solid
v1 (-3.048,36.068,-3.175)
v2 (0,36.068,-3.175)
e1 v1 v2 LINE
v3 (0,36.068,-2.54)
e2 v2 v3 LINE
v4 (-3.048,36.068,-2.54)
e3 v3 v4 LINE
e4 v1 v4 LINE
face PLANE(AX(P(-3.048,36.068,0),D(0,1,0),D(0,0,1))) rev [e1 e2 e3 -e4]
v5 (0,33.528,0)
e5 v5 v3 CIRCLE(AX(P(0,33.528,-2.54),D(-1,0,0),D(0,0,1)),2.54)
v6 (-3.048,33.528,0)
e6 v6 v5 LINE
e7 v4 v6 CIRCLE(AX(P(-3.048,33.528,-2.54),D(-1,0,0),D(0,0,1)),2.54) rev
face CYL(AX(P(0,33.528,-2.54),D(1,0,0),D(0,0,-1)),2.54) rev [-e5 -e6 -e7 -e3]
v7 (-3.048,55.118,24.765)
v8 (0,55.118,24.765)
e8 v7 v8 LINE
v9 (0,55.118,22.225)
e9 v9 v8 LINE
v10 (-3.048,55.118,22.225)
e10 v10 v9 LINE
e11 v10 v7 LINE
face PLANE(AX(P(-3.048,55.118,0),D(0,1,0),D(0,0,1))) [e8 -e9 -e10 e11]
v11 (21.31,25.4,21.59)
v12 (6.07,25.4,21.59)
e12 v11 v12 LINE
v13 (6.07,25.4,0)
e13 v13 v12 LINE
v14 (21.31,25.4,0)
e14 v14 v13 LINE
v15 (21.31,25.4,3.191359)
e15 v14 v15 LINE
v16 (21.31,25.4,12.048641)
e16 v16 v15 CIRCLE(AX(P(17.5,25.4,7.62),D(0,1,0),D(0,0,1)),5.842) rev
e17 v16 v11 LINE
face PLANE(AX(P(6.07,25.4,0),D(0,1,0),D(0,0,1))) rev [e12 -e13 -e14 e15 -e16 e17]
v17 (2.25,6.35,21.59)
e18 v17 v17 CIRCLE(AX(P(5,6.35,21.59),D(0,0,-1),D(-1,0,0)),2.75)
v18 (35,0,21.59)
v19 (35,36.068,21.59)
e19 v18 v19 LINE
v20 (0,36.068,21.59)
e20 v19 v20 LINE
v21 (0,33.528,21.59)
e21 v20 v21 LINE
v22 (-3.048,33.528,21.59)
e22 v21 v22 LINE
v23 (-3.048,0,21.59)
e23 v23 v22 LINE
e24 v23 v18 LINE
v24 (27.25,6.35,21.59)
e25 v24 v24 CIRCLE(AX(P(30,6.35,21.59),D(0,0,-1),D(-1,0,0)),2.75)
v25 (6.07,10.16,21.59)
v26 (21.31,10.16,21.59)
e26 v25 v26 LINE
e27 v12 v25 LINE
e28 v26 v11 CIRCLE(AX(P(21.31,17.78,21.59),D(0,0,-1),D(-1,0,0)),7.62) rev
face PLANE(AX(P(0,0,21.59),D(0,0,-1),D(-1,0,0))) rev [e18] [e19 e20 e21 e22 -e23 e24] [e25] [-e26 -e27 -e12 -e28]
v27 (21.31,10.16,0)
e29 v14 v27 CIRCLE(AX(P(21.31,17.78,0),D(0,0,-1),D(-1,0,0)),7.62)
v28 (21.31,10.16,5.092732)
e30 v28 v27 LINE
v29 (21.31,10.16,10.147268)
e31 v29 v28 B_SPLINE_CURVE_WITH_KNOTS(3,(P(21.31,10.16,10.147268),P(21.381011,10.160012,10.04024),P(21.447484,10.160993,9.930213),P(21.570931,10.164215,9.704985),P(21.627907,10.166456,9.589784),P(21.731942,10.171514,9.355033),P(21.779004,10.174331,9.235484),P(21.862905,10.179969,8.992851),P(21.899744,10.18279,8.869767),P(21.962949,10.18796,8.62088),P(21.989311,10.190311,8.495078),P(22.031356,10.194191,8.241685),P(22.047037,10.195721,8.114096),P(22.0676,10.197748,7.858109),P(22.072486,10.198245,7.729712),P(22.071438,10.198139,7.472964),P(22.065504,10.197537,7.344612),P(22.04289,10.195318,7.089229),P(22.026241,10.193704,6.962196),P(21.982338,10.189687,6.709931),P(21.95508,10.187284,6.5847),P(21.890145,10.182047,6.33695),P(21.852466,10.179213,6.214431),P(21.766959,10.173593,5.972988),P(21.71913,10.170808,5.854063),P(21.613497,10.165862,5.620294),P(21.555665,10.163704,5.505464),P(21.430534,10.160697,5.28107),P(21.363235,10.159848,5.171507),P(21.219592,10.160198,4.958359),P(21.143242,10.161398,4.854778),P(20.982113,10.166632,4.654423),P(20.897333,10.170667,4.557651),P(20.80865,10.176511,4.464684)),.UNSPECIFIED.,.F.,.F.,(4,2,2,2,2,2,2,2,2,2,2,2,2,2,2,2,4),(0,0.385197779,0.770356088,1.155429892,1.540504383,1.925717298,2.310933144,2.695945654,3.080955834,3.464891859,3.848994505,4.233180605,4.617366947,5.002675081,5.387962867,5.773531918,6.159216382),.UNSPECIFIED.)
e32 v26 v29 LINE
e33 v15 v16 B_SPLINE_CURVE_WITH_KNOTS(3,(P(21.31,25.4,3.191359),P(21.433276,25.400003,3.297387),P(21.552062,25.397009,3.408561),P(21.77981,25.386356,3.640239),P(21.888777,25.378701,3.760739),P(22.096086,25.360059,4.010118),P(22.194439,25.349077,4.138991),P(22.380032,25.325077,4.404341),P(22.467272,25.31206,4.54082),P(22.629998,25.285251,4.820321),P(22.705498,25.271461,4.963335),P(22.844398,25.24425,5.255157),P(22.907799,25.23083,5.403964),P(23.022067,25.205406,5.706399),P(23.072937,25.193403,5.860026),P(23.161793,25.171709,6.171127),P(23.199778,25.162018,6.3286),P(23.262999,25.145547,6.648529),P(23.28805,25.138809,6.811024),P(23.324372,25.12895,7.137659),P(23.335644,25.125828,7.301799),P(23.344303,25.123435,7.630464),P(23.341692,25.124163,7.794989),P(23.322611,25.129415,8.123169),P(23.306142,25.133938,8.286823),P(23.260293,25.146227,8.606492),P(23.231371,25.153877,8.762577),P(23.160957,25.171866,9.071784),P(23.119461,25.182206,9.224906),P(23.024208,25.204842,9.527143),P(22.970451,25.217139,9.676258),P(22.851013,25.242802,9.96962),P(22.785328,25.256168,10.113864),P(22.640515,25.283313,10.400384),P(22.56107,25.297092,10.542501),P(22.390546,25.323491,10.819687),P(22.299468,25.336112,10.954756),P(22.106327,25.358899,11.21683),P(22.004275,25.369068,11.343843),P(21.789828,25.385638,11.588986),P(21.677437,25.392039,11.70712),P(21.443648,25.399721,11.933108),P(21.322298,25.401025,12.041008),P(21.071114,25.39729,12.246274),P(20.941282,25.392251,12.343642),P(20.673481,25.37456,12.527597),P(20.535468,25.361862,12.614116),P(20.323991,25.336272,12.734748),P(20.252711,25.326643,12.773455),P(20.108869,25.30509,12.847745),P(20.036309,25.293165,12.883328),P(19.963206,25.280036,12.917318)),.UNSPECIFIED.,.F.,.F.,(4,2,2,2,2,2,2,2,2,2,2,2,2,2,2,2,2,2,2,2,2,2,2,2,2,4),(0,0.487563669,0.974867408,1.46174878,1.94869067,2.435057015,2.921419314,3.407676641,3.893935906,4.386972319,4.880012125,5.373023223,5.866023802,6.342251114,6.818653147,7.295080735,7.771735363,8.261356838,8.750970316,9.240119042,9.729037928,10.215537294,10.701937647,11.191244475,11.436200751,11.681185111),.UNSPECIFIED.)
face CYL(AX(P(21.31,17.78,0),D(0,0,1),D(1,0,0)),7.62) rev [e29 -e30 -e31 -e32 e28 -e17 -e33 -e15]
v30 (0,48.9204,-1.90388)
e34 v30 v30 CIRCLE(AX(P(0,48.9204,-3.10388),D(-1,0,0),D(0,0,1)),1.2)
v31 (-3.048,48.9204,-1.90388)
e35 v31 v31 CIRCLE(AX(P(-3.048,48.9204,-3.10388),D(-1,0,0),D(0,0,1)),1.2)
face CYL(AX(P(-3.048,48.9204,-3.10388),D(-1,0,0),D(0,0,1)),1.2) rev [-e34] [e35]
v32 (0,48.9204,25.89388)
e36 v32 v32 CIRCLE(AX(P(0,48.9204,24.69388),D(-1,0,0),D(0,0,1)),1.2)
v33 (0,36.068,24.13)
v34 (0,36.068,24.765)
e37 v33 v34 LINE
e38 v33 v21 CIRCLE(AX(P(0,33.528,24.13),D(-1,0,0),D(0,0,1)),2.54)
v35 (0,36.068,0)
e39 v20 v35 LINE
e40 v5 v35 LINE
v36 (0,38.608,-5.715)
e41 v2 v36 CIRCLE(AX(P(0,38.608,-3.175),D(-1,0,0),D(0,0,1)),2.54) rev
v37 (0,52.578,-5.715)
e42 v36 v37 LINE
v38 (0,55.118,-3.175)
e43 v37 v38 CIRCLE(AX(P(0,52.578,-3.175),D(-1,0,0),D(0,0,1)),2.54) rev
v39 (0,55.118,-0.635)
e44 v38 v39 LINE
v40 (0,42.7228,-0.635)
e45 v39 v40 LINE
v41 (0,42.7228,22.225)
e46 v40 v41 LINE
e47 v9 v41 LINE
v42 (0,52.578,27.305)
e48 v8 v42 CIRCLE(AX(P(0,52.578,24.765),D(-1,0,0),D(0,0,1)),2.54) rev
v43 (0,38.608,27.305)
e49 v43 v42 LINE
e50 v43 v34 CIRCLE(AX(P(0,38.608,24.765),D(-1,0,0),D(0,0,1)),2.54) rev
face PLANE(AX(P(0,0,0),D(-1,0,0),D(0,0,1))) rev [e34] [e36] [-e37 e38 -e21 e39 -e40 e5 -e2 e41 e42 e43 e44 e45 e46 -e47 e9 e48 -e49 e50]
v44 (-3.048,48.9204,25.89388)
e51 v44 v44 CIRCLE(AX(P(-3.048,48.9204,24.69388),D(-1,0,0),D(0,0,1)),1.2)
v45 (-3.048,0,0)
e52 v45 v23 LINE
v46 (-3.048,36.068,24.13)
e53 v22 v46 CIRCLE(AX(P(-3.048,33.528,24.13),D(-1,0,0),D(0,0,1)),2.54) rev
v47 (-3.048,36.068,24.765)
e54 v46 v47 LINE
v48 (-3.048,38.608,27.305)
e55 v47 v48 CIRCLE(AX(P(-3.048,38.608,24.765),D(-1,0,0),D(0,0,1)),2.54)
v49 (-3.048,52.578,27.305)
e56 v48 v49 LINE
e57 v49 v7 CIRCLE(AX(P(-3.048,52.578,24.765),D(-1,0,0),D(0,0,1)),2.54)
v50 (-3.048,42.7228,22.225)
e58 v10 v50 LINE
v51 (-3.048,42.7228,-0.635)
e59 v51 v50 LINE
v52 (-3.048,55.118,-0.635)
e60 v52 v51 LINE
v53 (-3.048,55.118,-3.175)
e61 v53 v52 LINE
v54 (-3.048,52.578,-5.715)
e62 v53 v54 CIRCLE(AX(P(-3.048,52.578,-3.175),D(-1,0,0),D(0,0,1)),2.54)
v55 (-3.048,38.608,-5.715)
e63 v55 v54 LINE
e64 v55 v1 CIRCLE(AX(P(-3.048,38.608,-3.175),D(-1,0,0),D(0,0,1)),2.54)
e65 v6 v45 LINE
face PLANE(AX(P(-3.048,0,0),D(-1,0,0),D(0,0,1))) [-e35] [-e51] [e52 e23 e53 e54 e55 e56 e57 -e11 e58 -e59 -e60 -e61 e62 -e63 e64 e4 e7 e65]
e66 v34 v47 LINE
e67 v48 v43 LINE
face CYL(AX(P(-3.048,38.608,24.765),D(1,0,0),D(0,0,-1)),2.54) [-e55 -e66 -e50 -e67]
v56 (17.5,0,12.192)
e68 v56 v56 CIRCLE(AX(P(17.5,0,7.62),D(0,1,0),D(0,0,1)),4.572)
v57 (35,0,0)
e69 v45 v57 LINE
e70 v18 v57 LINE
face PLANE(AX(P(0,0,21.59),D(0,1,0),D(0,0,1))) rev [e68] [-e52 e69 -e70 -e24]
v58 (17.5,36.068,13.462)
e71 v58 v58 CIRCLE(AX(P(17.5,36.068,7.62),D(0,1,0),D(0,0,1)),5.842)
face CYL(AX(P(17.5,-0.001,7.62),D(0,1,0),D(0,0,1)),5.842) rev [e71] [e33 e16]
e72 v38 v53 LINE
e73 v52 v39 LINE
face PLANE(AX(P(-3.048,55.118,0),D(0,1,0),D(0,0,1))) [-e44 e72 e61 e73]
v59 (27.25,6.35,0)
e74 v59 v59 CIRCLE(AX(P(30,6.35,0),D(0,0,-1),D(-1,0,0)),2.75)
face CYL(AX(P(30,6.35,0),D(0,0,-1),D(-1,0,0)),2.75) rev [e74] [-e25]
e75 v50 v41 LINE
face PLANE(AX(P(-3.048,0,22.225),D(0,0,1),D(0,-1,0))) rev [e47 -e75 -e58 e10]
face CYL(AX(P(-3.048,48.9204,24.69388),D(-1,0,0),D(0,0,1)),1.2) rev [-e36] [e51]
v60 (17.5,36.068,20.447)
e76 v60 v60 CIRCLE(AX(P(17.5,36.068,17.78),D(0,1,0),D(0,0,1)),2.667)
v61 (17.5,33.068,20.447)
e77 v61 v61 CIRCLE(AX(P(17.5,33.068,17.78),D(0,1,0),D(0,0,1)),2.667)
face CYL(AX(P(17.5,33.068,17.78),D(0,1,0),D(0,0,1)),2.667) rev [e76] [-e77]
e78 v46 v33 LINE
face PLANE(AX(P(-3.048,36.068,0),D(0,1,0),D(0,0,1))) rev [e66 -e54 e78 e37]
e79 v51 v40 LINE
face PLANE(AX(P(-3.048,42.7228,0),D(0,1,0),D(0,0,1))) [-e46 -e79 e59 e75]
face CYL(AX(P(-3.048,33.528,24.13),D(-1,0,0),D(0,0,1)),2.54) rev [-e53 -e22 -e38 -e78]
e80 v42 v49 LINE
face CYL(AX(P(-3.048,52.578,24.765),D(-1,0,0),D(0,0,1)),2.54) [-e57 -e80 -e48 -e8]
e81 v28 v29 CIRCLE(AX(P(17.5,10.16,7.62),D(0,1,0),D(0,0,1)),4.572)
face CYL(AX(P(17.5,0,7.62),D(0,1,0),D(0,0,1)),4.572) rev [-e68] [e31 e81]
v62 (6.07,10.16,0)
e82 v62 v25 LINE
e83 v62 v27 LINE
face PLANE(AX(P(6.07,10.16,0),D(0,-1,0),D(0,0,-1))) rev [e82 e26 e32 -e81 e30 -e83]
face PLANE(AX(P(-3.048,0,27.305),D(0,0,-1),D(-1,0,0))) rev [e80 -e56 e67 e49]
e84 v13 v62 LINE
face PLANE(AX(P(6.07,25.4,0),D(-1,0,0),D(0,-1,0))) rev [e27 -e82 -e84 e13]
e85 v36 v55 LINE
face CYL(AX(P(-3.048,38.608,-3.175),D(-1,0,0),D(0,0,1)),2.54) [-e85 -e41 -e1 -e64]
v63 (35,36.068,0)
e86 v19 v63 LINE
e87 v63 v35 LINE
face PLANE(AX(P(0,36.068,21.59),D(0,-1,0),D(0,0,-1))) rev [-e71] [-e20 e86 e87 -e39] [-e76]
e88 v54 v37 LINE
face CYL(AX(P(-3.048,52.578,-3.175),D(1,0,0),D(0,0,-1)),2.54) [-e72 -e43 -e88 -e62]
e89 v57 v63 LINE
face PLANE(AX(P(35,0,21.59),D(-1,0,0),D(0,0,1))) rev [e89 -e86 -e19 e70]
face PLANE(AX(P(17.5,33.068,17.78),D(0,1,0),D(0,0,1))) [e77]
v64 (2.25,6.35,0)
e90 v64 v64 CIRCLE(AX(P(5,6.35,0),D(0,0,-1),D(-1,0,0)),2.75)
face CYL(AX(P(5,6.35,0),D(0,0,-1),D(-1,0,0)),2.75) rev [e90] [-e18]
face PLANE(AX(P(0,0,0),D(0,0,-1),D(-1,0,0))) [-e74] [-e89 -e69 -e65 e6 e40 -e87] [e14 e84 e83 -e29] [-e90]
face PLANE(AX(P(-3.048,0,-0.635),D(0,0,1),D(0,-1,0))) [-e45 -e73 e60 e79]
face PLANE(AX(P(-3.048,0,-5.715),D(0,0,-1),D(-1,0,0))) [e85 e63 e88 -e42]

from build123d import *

# Parameters (mm, degrees)
SKETCH2_W            = 35
SKETCH2_H            = 36.068
BOSS_EXTRUDE1_DEPTH  = 21.59
M5_CLEARANCE_HOLE1_D = 5.5
SKETCH13_W           = 22.86
SKETCH13_H           = 15.24
CUT_EXTRUDE3_DEPTH   = 55.699439887
CUT_EXTRUDE1_REACH   = 56.699
SKETCH5_R            = 5.842
BOSS_EXTRUDE2_DEPTH  = 3.048
M2_CLEARANCE_HOLE1_D = 2.4
FILLET2_R            = 2.54
SKETCH11_R           = 2.667
CUT_EXTRUDE2_DEPTH   = 3
SKETCH14_R           = 4.572
CUT_EXTRUDE4_DEPTH   = 64.180572876
FILLET3_R            = 7.62


with BuildPart() as part:
    # Sketch2 → Boss-Extrude1 (new body)
    with BuildSketch(Plane.XY):
        with Locations((17.5, 18.034)):
            Rectangle(SKETCH2_W, SKETCH2_H)
    extrude(amount=BOSS_EXTRUDE1_DEPTH)

    # M5 Clearance Hole1 (through all)
    with Locations(Plane(origin=(0, 0, 0), x_dir=(1, 0, 0), z_dir=(0, 0, -1))):
        with Locations((5, -6.35), (30, -6.35)):
            Hole(M5_CLEARANCE_HOLE1_D / 2)

    # Sketch13 → Cut-Extrude3 (cut, through all)
    with BuildSketch(Plane.XY.offset(21.59)):
        with Locations((17.5, 17.78)):
            Rectangle(SKETCH13_W, SKETCH13_H)
    extrude(amount=-CUT_EXTRUDE3_DEPTH, mode=Mode.SUBTRACT)

    # Sketch5 → Cut-Extrude1 (cut, up to next)
    with BuildSketch(Plane(origin=(0, 36.068, 0), x_dir=(1, 0, 0), z_dir=(0, 1, 0)), mode=Mode.PRIVATE) as cut_extrude1_sk1:
        with Locations(Location((17.5, -7.62, 0), (0, 0, 270))):
            Circle(SKETCH5_R)
    cut_extrude1_tool1 = extrude(cut_extrude1_sk1.sketch, amount=-CUT_EXTRUDE1_REACH, mode=Mode.PRIVATE) & part.part
    add(cut_extrude1_tool1.solids().sort_by_distance((17.5, 36.068, 7.62))[0], mode=Mode.SUBTRACT)

    # Sketch7 → Boss-Extrude2 (add)
    with BuildSketch(Plane.ZY):
        Polygon((-5.715, 55.118), (-5.715, 36.068), (0, 36.068), (0, 0), (21.59, 0), (21.59, 36.068), (27.305, 36.068), (27.305, 55.118), (22.225, 55.118), (22.225, 42.7228), (-0.635, 42.7228), (-0.635, 55.118), align=None)
    extrude(amount=BOSS_EXTRUDE2_DEPTH)

    # M2 Clearance Hole1 (through all)
    with Locations(Plane.ZY.offset(3.048)):
        with Locations((-3.10388, 48.9204), (24.69388, 48.9204)):
            Hole(M2_CLEARANCE_HOLE1_D / 2)

    # Fillet2
    fillet2_edges = [part.edges().sort_by_distance(p)[0] for p in [
        (-1.524, 55.118, -5.715),
        (-1.524, 36.068, -5.715),
        (-1.524, 36.068, 0),
        (-1.524, 36.068, 21.59),
        (-1.524, 36.068, 27.305),
        (-1.524, 55.118, 27.305),
    ]]
    fillet(fillet2_edges, radius=FILLET2_R)

    # Sketch11 → Cut-Extrude2 (cut)
    with BuildSketch(Plane(origin=(0, 36.068, 0), x_dir=(1, 0, 0), z_dir=(0, 1, 0))):
        with Locations(Location((17.5, -17.78, 0), (0, 0, 270))):
            Circle(SKETCH11_R)
    extrude(amount=-CUT_EXTRUDE2_DEPTH, mode=Mode.SUBTRACT)

    # Sketch14 → Cut-Extrude4 (cut, through all)
    with BuildSketch(Plane(origin=(0, 10.16, 0), x_dir=(1, 0, 0), z_dir=(0, 1, 0))):
        with Locations(Location((17.5, -7.62, 0), (0, 0, 270))):
            Circle(SKETCH14_R)
    extrude(amount=-CUT_EXTRUDE4_DEPTH, mode=Mode.SUBTRACT)

    # Fillet3
    # the kernel refuses this fillet: 7.62 mm, written as the material it adds along each edge
    with BuildSketch(Plane(origin=(28.93, 25.4, 21.59), x_dir=(-1, 0, 0), z_dir=(0, 0, -1))) as fillet3_piece_1_section:
        with BuildLine():
            CenterArc((FILLET3_R, -FILLET3_R), FILLET3_R, 90, 90)
            Line((0, -FILLET3_R), (0, 0))
            Line((0, 0), (FILLET3_R, 0))
        make_face()
    fillet3_piece_1 = extrude(amount=21.59, mode=Mode.PRIVATE)
    fillet3_piece_1 = fillet3_piece_1 - Plane(origin=(17.5, 23.659865562, 7.62), x_dir=(0, 0, 1), z_dir=(0, 1, 0)) * Cylinder(5.842, 74, mode=Mode.PRIVATE)
    add(fillet3_piece_1)
    with BuildSketch(Plane(origin=(28.93, 10.16, 21.59), x_dir=(0, 1, 0), z_dir=(0, 0, -1))) as fillet3_piece_2_section:
        with BuildLine():
            CenterArc((FILLET3_R, -FILLET3_R), FILLET3_R, 90, 90)
            Line((0, -FILLET3_R), (0, 0))
            Line((0, 0), (FILLET3_R, 0))
        make_face()
    fillet3_piece_2 = extrude(amount=21.59, mode=Mode.PRIVATE)
    fillet3_piece_2 = fillet3_piece_2 - Plane(origin=(17.5, 11.887502218, 7.62), x_dir=(0, 0, 1), z_dir=(0, 1, 0)) * Cylinder(4.572, 74, mode=Mode.PRIVATE)
    add(fillet3_piece_2)


solid = part.part
